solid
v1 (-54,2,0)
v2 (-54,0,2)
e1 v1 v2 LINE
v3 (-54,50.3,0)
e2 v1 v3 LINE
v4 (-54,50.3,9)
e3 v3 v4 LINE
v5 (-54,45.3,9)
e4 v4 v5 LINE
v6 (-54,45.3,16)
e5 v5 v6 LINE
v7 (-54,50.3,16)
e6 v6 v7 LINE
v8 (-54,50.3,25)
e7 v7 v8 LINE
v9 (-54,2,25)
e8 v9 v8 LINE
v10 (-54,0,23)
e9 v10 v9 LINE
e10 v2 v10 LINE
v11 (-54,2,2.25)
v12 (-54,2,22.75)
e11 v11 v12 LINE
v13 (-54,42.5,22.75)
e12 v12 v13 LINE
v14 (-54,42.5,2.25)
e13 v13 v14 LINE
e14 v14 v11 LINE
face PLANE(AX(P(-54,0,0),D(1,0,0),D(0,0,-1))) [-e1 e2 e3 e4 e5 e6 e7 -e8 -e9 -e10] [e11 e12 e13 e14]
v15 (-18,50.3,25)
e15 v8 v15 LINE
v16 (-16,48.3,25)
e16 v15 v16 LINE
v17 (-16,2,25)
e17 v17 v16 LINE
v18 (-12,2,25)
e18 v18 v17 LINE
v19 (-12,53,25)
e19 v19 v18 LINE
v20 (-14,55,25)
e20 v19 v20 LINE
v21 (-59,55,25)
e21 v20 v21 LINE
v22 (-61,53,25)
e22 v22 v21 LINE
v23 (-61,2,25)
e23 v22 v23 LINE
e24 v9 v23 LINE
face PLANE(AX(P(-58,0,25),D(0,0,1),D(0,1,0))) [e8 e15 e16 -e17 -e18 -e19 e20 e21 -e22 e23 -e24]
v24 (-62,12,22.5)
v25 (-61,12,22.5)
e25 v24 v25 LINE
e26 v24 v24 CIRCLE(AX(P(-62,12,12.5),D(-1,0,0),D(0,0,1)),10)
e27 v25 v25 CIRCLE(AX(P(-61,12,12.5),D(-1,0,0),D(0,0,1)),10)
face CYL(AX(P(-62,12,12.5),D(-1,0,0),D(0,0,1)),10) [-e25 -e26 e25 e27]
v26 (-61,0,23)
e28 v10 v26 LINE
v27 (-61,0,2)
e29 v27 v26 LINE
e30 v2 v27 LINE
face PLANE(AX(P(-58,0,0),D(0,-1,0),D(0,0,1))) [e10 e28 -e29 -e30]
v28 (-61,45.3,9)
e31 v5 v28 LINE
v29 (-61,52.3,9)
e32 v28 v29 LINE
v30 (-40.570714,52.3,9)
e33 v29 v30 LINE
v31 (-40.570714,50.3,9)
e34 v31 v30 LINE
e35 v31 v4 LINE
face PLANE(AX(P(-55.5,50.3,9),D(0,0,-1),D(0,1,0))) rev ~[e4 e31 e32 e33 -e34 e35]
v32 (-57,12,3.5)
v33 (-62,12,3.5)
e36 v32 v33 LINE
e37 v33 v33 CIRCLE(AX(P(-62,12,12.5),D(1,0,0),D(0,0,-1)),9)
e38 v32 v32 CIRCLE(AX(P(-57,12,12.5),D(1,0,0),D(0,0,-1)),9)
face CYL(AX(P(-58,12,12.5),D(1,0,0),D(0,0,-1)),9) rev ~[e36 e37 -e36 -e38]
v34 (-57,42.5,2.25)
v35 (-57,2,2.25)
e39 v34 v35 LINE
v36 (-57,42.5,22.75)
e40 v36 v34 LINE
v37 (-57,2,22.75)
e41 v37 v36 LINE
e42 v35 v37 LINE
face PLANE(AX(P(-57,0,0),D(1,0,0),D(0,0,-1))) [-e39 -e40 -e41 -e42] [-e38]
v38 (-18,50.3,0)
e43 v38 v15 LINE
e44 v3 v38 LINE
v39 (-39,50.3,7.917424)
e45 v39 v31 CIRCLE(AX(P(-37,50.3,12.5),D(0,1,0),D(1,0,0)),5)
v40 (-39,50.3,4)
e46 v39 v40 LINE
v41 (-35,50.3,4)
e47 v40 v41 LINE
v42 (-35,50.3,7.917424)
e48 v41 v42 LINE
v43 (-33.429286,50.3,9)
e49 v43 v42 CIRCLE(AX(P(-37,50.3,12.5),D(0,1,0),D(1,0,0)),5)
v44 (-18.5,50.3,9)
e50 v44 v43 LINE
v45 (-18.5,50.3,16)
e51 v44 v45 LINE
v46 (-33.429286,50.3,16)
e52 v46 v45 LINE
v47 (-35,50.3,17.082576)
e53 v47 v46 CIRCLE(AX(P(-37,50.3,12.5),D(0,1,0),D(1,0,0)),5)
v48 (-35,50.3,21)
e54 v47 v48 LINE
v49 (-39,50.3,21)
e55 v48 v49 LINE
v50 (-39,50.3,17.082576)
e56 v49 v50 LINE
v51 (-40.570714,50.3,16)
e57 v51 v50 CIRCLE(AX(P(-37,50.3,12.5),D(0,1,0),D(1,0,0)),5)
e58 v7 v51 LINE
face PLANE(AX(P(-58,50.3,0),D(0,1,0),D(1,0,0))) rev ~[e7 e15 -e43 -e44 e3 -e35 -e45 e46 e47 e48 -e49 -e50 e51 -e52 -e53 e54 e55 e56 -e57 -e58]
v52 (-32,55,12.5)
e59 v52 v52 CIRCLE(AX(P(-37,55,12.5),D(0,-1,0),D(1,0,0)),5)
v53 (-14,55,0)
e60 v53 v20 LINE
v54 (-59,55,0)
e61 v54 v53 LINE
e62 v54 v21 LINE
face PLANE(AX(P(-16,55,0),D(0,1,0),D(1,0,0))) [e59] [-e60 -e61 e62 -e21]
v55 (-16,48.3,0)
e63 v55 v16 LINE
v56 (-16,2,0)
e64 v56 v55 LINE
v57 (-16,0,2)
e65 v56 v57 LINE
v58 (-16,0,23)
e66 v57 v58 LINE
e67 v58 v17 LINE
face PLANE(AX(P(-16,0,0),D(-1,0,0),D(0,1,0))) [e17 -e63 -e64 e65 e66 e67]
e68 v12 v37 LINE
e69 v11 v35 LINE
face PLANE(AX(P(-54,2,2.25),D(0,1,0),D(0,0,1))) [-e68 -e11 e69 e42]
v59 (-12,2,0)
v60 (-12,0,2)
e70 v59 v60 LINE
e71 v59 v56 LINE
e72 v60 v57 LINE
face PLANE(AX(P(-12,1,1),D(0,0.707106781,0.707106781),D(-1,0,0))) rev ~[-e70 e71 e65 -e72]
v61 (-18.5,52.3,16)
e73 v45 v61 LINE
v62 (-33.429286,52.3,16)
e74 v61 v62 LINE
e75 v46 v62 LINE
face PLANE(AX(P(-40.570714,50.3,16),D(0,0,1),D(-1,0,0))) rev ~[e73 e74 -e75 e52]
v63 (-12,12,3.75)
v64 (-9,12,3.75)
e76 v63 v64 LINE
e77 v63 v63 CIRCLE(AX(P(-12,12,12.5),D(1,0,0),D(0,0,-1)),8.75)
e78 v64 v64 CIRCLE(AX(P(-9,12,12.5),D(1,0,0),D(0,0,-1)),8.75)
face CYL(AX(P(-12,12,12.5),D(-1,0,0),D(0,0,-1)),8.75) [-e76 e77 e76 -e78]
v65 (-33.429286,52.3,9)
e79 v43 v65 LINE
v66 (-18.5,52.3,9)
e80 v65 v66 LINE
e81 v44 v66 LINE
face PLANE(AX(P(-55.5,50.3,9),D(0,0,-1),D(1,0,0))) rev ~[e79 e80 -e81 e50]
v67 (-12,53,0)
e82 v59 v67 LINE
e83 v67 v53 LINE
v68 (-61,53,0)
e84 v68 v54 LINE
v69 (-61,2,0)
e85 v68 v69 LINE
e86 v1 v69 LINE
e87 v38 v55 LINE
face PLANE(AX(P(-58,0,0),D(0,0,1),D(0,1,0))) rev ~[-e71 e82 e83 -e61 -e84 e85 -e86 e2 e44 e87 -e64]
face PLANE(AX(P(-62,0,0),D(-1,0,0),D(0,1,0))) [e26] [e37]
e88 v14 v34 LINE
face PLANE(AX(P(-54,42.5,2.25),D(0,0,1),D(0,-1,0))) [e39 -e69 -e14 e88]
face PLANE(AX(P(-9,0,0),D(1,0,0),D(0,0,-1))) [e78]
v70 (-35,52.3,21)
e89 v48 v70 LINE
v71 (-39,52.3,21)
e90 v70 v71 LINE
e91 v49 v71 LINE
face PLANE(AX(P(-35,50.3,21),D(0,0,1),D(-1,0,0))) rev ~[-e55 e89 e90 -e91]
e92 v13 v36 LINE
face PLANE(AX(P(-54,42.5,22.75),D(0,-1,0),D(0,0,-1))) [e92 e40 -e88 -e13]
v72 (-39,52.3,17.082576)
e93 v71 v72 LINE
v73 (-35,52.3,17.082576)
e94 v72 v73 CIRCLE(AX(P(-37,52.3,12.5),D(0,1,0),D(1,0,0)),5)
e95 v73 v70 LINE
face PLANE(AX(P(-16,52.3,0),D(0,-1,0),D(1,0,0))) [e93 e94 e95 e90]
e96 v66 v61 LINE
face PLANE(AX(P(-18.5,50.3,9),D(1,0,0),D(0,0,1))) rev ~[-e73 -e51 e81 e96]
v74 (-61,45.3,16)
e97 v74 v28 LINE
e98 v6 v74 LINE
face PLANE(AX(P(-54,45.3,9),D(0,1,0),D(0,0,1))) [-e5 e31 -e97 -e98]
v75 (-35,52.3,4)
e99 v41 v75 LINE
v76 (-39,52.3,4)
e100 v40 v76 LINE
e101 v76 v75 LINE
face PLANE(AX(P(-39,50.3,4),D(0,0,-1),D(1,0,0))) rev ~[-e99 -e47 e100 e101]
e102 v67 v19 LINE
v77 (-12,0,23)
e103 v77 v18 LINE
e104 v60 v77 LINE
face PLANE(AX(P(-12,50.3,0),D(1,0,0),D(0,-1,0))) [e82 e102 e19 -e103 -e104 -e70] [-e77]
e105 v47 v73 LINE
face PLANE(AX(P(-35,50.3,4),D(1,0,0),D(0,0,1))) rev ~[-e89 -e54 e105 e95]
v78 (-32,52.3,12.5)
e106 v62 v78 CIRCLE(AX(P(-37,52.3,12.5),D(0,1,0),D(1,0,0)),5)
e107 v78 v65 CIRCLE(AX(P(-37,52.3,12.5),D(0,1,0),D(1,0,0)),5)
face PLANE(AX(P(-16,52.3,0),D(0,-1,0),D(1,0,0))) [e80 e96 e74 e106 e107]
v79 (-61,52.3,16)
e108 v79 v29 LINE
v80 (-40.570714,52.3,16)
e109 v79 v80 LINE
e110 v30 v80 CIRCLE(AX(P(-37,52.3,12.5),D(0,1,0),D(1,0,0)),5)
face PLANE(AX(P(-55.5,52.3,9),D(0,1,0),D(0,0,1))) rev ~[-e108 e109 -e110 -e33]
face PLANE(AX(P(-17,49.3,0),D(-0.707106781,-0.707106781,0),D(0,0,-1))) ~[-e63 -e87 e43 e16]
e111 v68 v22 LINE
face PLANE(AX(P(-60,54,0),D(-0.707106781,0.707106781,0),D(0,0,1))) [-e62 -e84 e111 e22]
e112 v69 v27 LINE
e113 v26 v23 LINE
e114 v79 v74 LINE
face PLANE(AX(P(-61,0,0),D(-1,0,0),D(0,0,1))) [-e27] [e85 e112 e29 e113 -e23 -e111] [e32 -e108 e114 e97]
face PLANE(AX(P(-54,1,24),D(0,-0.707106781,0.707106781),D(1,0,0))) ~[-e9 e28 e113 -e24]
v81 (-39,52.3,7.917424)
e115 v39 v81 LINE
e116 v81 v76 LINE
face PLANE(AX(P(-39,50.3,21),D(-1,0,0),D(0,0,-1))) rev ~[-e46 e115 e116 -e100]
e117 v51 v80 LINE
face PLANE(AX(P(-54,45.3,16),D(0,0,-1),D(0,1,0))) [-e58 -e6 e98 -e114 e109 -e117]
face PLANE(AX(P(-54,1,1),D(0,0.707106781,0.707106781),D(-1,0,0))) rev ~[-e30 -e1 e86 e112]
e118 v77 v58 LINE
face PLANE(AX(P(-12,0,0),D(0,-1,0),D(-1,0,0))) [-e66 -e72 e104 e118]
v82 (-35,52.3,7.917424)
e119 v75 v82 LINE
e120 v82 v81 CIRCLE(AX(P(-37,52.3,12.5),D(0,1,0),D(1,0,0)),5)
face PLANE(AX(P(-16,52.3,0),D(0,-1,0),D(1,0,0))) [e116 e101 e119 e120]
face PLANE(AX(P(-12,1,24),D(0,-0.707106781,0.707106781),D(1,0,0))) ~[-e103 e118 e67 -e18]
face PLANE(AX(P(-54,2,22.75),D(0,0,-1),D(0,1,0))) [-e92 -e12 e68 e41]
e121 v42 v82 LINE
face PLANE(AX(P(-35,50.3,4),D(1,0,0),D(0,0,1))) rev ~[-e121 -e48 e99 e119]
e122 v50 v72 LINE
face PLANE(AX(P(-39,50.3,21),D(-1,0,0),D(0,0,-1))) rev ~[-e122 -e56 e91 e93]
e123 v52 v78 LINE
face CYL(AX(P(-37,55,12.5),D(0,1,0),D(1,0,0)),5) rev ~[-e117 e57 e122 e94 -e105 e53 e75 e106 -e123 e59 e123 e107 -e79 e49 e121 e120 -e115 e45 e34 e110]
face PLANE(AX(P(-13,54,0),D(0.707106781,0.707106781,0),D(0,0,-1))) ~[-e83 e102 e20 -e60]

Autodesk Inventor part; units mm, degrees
ref_plane "YZ Plane" through (0, 0, 0) normal (1, 0, 0) x (0, 1, 0)
ref_plane "XZ Plane" through (0, 0, 0) normal (0, 1, 0) x (-1, 0, 0)
ref_plane "XY Plane" through (0, 0, 0) normal (0, 0, 1) x (1, 0, 0)
sketch "Boceto1" plane through (0, 0, 0) normal (0, 0, 1) x (1, 0, 0)
  line L0 (-12, 0) -> (-16, 0)
  line L1 (-16, 0) -> (-16, 55)
  line L2 (-16, 55) -> (-12, 55)
  line L3 (-12, 55) -> (-12, 0)
  line L4 (-12, 55) -> (-62, 55)
  line L5 (-62, 55) -> (-62, 50.3)
  line L6 (-62, 50.3) -> (-12, 50.3)
  line L7 (-12, 50.3) -> (-12, 55)
  line L8 (-62, 55) -> (-58, 55)
  line L9 (-58, 55) -> (-58, 0)
  line L10 (-58, 0) -> (-62, 0)
  line L11 (-62, 0) -> (-62, 55)
  dimension "d4" = 4
  dimension "d5" = 55
  dimension "d6" = 50
  dimension "d7" = 4.7
  dimension "d8" = 4
  dimension "d9" = 55
extrude "Extrusión1" add sketch "Boceto1" along normal blind 25
sketch "Boceto2" plane through (-58, 0, 0) normal (1, 0, 0) x (0, 0, -1)
  line L0 (-25, 0) -> (-25, 50.3) projected
  circle A0 centre (-12.5, 12) radius 9
  line L1 (0, 0) -> (-25, 0) projected
  dimension "d12" = 12.5
  dimension "d13" = 18
  dimension "d21" = 12
extrude "Extrusión2" cut sketch "Boceto2" against normal blind 15
sketch "Boceto3" plane through (-12, 0, 0) normal (1, 0, 0) x (0, 0, -1)
  line L0 (0, 0) -> (0, 55) projected
  line L1 (0, 0) -> (-25, 0) projected
  circle A0 centre (-12.5, 12) radius 8.75
  dimension "d16" = 17.5
  dimension "d17" = 12
  dimension "d18" = 12.5
extrude "Extrusión3" add sketch "Boceto3" along normal blind 3
sketch "Boceto4" plane through (-58, 0, 0) normal (1, 0, 0) x (0, 0, -1)
  circle A0 centre (-12.5, 12) radius 9 projected
  line L0 (0, 50.3) -> (-25, 50.3) projected
  line L1 (-25, 0) -> (-25, 50.3) projected
  line L2 (0, 0) -> (-25, 0) projected
  line L3 (0, 0) -> (0, 50.3) projected
extrude "Extrusión4" add sketch "Boceto4" along normal blind 4
sketch "Boceto7" plane through (-62, 55, 0) normal (0, 1, 0) x (1, 0, 0)
  line L0 (50, 0) -> (0, 0)
  circle A0 centre (25, -12.5) radius 5
  line L1 (6.5, -9) -> (43.5, -9)
  line L2 (43.5, -9) -> (43.5, -16)
  line L3 (43.5, -16) -> (6.5, -16)
  line L4 (6.5, -16) -> (6.5, -9)
  line L5 (23, -4) -> (27, -4)
  line L6 (27, -4) -> (27, -21)
  line L7 (27, -21) -> (23, -21)
  line L8 (23, -21) -> (23, -4)
  line L9 (50, 0) -> (0, 0) projected
  point P0 (58, 0)
  point P1 (6.5, -12.5)
  point P2 (25, -9)
  point P3 (23, -12.5)
  point P4 (25, -4)
  point P5 (25, 0)
  dimension "d29" = 10
  dimension "d30" = 37
  dimension "d31" = 7
  dimension "d32" = 12.5
  dimension "d33" = 4
  dimension "d34" = 17
extrude "Extrusión6" cut sketch "Boceto7" against normal blind 10 contours A0 L3 L6 L1 | L1 L6 A0 | A0 L6 L3 | L6 L1 L8 A0 | L6 L3 L8 L1 | A0 L8 L3 L6 | L8 L1 A0 | L8 L3 A0 L1 | A0 L3 L8
sketch "Boceto8" plane through (-16, 50.3, 0) normal (0, -1, 0) x (1, 0, 0)
  line L0 (-39.5, 9) -> (-2.5, 9) projected
  line L1 (-39.5, 16) -> (-39.5, 9) projected
  line L2 (-2.5, 16) -> (-39.5, 16) projected
  line L3 (-2.5, 9) -> (-2.5, 16) projected
  circle A0 centre (-21, 12.5) radius 5 projected
  line L4 (-23, 21) -> (-23, 4) projected
  line L5 (-23, 4) -> (-19, 4) projected
  line L6 (-19, 4) -> (-19, 21) projected
  line L7 (-19, 21) -> (-23, 21) projected
  point P0 (16, 0)
extrude "Extrusión8" cut sketch "Boceto8" against normal blind 2 contours L1 L2 A0 L0 | A0 L2 L4 L0 | L4 L2 L6 L0 | L6 L2 A0 L0 | A0 L2 L3 L0
sketch "Boceto9" plane through (-16, 50.3, 0) normal (0, -1, 0) x (1, 0, 0)
  line L0 (-19, 4) -> (-19, 21) projected
  line L1 (-23, 21) -> (-23, 4) projected
  line L2 (-23, 4) -> (-19, 4) projected
  line L3 (-19, 21) -> (-23, 21) projected
  point P0 (16, 0)
extrude "Extrusión9" cut sketch "Boceto9" against normal blind 2
sketch "Boceto10" plane through (-54, 0, 0) normal (1, 0, 0) x (0, 0, -1)
  line L0 (-16, 50.3) -> (-9, 50.3)
  line L1 (-9, 50.3) -> (-9, 48.8686)
  line L2 (-9, 48.8686) -> (-16, 48.8686)
  line L3 (-16, 48.8686) -> (-16, 50.3)
  dimension "d43" = 7
  dimension "d44" = 1.4314
extrude "Extrusión10" cut sketch "Boceto10" against normal blind 2
chamfer "Chaflán3" distance 2 angle 45 1 edges at (-16, 50.3, 12.5)
chamfer "Chaflán4" distance 2 angle 45 1 edges at (-12, 55, 12.5)
sketch "Boceto11" plane through (-16, 50.3, 0) normal (0, 1, 0) x (1, 0, 0)
  line L0 (2, -16) -> (2, -9) projected
  line L1 (-40, -16) -> (-43.5, -16) projected
  line L2 (4, -9) -> (4, -16) projected
  line L3 (-43.5, -9) -> (-40, -9) projected
  point P0 (16, 0)
sketch "Boceto14" plane through (-62, 0, 0) normal (-1, 0, 0) x (0, 0, 1)
  circle A0 centre (12.5, 12) radius 9 projected
  line L0 (25, 55) -> (25, 0) projected
  line L1 (0, 55) -> (25, 55) projected
  line L2 (0, 55) -> (0, 0) projected
  line L3 (0, 0) -> (25, 0) projected
  circle A1 centre (12.5, 12) radius 10
extrude "Extrusión13" cut sketch "Boceto14" against normal blind 1 contours L0 L3 L2 L1
chamfer "Chaflán8" distance 2 angle 45 1 edges at (-61, 55, 12.5)
chamfer "Chaflán10" distance 2 angle 45 4 edges at (-57.5, 0, 0) (-57.5, 0, 25) (-14, 0, 25) (-14, 0, 0)
sketch "Boceto18" plane through (-54, 0, 0) normal (1, 0, 0) x (0, 0, -1)
  line L0 (-16, 50.3) -> (-9, 50.3)
  line L1 (-9, 50.3) -> (-9, 45.3)
  line L2 (-9, 45.3) -> (-16, 45.3)
  line L3 (-16, 45.3) -> (-16, 50.3)
  point P0 (0, 0)
extrude "Extrusión17" cut sketch "Boceto18" against normal blind 10
sketch "Boceto19" plane through (-55.5, 52.3, 16) normal (1, 0, 0) x (0, 0, -1)
  line L0 (0, -2) -> (7, -2) projected
  line L1 (7, -2) -> (7, 0) projected
  line L2 (7, 0) -> (0, 0) projected
  line L3 (0, -2) -> (0, 0) projected
  point P0 (16, -52.3)
extrude "Extrusión18" cut sketch "Boceto19" against normal blind 10
sketch "Boceto20" plane through (-54, 0, 0) normal (1, 0, 0) x (0, 0, -1)
  line L0 (-25, 50.3) -> (-16, 50.3) projected
  circle A0 centre (-12.5, 12) radius 9 projected
  line L1 (-22.75, 42.5) -> (-2.25, 42.5)
  line L2 (-2.25, 42.5) -> (-2.25, 2)
  line L3 (-2.25, 2) -> (-22.75, 2)
  line L4 (-22.75, 2) -> (-22.75, 42.5)
  line L5 (-22.75, 42.5) -> (-2.25, 2) construction
  line L6 (-2.25, 42.5) -> (-22.75, 2) construction
  line L7 (-22.75, 42.5) -> (-2.25, 42.5) construction
  point P0 (0, 0)
  point P1 (-12.5, 22.25)
  point P2 (-12.5, 2)
  dimension "d100" = 20.5
  dimension "d102" = 40.5
  dimension "d103" = 10
extrude "Extrusión19" cut sketch "Boceto20" against normal blind 3
properties part number "Enlace2Base"
